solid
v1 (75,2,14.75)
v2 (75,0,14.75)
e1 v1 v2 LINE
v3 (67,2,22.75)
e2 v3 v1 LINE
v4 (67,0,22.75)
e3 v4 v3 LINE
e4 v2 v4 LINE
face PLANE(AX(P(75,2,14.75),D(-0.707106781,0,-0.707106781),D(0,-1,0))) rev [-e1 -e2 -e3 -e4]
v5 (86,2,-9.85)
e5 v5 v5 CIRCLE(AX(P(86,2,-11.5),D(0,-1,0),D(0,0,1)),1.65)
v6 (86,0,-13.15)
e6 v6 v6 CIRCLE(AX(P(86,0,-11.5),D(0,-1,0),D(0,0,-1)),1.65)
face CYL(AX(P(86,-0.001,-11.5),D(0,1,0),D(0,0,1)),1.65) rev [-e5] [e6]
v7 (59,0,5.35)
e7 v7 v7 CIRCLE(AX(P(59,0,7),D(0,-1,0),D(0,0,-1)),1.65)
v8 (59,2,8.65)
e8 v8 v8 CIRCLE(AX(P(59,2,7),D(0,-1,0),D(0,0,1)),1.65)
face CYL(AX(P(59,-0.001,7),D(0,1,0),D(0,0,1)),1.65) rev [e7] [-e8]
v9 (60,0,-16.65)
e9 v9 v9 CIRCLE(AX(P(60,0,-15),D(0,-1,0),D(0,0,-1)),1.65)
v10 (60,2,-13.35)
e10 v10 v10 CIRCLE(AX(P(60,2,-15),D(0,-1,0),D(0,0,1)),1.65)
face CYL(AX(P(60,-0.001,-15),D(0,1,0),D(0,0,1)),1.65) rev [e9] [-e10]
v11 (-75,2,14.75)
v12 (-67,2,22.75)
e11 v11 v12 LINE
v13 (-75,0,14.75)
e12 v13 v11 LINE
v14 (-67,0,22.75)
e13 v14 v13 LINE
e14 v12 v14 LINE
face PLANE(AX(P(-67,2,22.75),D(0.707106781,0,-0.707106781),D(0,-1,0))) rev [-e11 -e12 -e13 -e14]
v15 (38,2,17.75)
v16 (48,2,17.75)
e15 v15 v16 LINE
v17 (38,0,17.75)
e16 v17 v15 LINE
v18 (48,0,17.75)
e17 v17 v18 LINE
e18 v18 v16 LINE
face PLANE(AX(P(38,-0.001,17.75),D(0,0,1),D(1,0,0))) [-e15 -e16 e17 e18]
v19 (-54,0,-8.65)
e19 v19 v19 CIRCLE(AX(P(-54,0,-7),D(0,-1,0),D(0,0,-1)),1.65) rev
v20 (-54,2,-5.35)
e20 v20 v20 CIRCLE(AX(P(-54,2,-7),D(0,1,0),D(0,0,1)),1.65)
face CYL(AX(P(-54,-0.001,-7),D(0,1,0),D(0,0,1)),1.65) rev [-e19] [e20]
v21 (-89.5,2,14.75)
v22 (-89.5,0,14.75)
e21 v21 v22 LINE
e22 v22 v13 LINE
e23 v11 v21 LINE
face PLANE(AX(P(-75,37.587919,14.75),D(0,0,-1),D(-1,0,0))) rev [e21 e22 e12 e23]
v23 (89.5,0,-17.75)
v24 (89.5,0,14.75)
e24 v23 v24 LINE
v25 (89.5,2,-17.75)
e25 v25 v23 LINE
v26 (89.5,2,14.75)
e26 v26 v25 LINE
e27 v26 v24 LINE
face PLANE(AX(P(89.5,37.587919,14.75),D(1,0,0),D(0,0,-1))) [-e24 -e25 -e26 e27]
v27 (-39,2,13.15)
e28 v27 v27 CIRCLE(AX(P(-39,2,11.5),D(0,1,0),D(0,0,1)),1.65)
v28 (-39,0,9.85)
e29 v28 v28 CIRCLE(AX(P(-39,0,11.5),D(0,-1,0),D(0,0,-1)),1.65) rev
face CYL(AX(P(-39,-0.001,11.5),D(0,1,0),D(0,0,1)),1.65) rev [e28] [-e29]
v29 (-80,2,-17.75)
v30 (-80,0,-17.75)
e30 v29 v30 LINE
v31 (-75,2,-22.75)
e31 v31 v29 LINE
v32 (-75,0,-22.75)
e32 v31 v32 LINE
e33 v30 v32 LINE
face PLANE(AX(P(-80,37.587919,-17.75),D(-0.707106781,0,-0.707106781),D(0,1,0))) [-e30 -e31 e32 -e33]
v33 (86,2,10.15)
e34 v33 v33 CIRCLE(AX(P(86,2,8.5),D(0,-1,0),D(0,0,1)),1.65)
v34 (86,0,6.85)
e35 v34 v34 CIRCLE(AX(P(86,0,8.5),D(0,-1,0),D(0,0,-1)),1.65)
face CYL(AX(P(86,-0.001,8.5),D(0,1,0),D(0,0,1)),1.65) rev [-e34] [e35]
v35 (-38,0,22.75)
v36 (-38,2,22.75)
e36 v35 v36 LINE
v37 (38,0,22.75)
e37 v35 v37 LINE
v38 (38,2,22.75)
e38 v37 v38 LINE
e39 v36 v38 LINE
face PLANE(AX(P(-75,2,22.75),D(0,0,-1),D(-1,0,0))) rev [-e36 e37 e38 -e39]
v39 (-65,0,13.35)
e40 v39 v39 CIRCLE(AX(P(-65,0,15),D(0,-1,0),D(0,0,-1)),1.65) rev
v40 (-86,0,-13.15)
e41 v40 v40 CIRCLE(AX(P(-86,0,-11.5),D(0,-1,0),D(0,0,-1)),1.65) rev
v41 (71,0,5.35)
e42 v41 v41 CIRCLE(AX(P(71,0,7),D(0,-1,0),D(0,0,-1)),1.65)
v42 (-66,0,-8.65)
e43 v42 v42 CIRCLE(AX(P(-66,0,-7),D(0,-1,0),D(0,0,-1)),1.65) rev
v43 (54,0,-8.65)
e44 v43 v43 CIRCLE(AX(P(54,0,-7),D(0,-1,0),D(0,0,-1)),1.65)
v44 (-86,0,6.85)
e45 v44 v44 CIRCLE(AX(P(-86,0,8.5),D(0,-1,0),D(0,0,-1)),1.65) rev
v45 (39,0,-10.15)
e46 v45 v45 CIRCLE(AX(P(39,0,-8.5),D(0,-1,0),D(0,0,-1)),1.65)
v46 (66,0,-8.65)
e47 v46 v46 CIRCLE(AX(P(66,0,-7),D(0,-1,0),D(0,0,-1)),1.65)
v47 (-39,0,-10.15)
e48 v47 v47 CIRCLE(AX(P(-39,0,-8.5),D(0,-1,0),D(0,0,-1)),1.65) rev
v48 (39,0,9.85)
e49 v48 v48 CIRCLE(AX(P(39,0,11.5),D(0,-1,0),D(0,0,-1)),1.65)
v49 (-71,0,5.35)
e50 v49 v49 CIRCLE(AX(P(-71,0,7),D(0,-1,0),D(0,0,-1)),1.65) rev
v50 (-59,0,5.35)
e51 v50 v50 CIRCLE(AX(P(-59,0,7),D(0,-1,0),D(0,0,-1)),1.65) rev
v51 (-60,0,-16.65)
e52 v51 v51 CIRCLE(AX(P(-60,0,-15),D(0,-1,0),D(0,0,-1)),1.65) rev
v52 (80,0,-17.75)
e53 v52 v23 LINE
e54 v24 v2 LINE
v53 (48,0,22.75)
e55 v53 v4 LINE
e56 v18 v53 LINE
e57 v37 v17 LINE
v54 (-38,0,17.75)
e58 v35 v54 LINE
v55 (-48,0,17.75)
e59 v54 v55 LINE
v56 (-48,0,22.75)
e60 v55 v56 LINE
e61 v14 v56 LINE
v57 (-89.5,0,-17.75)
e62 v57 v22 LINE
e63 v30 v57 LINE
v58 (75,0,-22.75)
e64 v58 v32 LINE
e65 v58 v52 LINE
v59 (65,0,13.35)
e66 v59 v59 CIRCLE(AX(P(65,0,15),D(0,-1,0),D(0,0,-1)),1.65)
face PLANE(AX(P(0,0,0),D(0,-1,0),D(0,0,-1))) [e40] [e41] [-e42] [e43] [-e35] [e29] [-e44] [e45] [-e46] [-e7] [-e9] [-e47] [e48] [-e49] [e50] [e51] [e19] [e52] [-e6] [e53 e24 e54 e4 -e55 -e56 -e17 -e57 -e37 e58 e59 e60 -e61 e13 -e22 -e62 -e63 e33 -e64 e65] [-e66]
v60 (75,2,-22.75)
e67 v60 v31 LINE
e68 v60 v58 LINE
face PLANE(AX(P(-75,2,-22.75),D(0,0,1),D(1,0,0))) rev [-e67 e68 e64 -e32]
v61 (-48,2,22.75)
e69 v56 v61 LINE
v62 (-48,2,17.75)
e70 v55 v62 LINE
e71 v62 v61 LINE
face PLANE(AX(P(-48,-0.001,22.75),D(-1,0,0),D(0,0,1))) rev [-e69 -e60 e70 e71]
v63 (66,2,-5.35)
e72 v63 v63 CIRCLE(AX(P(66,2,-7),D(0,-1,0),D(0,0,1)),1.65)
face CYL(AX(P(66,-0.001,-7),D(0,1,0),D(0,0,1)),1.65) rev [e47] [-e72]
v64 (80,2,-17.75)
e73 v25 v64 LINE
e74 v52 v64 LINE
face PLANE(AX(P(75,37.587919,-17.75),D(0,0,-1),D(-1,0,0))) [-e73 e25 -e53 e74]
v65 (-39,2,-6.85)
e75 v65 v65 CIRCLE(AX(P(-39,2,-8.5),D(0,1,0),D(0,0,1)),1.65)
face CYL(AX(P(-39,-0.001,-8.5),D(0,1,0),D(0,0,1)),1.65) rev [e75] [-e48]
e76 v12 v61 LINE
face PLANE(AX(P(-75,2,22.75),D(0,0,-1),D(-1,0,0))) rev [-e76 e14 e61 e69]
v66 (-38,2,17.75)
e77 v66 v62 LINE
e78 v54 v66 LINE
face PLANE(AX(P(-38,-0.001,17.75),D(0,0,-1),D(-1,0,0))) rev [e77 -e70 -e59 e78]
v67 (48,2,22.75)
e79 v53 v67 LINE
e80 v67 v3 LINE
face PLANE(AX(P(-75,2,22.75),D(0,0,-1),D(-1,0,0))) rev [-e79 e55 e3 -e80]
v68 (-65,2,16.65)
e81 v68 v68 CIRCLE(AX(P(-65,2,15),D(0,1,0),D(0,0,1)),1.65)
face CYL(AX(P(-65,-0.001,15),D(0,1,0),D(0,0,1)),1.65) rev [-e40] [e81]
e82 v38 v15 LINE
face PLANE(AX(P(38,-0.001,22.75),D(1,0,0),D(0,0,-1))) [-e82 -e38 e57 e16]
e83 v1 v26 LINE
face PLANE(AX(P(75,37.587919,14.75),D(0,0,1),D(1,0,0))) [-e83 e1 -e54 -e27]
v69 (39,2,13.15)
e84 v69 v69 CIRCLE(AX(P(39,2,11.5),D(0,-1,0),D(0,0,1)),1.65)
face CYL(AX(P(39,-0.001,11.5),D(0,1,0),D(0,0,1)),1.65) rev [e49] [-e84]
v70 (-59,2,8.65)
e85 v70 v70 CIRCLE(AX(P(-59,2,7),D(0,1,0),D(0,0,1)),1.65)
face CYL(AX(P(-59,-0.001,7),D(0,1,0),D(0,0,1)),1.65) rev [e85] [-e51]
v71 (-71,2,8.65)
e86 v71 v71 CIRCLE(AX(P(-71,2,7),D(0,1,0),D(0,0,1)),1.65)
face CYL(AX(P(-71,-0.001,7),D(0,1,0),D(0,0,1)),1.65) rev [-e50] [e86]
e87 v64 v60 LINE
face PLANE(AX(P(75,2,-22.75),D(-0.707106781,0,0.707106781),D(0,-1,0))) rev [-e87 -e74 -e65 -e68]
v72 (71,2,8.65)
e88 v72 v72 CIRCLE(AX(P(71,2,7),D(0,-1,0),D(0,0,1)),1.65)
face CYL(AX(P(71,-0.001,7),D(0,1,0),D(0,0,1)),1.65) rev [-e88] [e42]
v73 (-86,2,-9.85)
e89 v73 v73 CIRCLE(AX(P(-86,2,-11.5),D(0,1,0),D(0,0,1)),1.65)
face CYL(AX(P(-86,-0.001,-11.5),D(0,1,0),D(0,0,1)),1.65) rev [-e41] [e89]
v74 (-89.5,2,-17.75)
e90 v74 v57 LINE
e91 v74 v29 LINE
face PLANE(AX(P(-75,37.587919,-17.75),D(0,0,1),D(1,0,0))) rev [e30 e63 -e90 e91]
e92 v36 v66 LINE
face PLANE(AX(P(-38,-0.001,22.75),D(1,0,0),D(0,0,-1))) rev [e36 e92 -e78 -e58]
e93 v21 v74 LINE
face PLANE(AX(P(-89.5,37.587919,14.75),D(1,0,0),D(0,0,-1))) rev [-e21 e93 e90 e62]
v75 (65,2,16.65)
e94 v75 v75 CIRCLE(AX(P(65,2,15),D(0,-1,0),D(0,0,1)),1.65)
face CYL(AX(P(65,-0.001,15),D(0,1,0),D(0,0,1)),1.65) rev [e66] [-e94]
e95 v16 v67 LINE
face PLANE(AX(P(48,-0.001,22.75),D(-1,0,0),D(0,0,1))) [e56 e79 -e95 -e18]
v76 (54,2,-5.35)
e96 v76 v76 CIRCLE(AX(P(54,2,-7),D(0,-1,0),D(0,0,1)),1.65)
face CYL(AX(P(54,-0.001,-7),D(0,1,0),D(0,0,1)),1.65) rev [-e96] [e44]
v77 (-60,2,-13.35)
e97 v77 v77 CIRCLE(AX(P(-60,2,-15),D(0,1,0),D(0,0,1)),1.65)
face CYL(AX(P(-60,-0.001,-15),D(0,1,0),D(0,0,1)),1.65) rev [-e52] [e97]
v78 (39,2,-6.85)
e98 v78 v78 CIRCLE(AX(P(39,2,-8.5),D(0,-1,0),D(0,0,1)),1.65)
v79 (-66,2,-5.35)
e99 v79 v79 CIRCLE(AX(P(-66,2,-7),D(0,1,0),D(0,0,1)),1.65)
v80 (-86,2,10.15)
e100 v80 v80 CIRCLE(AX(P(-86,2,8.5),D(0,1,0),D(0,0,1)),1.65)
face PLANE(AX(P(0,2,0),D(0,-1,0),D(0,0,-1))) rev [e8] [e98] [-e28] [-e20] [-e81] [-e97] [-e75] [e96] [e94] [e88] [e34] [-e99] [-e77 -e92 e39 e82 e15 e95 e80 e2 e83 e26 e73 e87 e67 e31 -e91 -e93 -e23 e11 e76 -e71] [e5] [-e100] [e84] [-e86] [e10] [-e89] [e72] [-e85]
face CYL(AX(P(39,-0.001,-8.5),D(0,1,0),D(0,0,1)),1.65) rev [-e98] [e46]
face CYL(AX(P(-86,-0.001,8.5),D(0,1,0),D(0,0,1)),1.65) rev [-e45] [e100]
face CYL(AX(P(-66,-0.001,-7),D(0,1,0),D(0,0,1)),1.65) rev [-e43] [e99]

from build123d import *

# Parameters (mm, degrees)
SKETCH_1_W          = 150
SKETCH_1_H          = 45.5
EXTRUDE_1_DEPTH     = 2
CUT_EXTRUDE_1_REACH = 80.4
SKETCH_2_R          = 1.65
CUT_EXTRUDE_2_REACH = 80.4
SKETCH_4_W          = 10
SKETCH_4_H          = 5
CHAMFER_1_SIZE      = 8
SKETCH_6_W          = 14.5
SKETCH_6_H          = 32.5
EXTRUDE_2_DEPTH     = 2
CUT_EXTRUDE_3_REACH = 94.368
SKETCH_7_R          = 1.65
CHAMFER_2_SIZE      = 5


with BuildPart() as part:
    # 草图1 → 凸台-拉伸1 (new body)
    with BuildSketch(Plane(origin=(0, 0, 0), x_dir=(1, 0, 0), z_dir=(0, 1, 0))):
        Rectangle(SKETCH_1_W, SKETCH_1_H)
    extrude(amount=EXTRUDE_1_DEPTH)

    # 草图2 → 切除-拉伸1 (cut, up to next)
    with BuildSketch(Plane(origin=(0, 2, 0), x_dir=(1, 0, 0), z_dir=(0, 1, 0)), mode=Mode.PRIVATE) as cut_extrude_1_sk1:
        with Locations(Location((-60, 15, 0), (0, 0, 270))):
            Circle(SKETCH_2_R)
    cut_extrude_1_tool1 = extrude(cut_extrude_1_sk1.sketch, amount=-CUT_EXTRUDE_1_REACH, mode=Mode.PRIVATE) & part.part
    # 草图2 → 切除-拉伸1 (cut, up to next)
    with BuildSketch(Plane(origin=(0, 2, 0), x_dir=(1, 0, 0), z_dir=(0, 1, 0)), mode=Mode.PRIVATE) as cut_extrude_1_sk2:
        with Locations(Location((-66, 7, 0), (0, 0, 270))):
            Circle(SKETCH_2_R)
    cut_extrude_1_tool2 = extrude(cut_extrude_1_sk2.sketch, amount=-CUT_EXTRUDE_1_REACH, mode=Mode.PRIVATE) & part.part
    # 草图2 → 切除-拉伸1 (cut, up to next)
    with BuildSketch(Plane(origin=(0, 2, 0), x_dir=(1, 0, 0), z_dir=(0, 1, 0)), mode=Mode.PRIVATE) as cut_extrude_1_sk3:
        with Locations(Location((-54, 7, 0), (0, 0, 270))):
            Circle(SKETCH_2_R)
    cut_extrude_1_tool3 = extrude(cut_extrude_1_sk3.sketch, amount=-CUT_EXTRUDE_1_REACH, mode=Mode.PRIVATE) & part.part
    # 草图2 → 切除-拉伸1 (cut, up to next)
    with BuildSketch(Plane(origin=(0, 2, 0), x_dir=(1, 0, 0), z_dir=(0, 1, 0)), mode=Mode.PRIVATE) as cut_extrude_1_sk4:
        with Locations(Location((-71, -7, 0), (0, 0, 270))):
            Circle(SKETCH_2_R)
    cut_extrude_1_tool4 = extrude(cut_extrude_1_sk4.sketch, amount=-CUT_EXTRUDE_1_REACH, mode=Mode.PRIVATE) & part.part
    # 草图2 → 切除-拉伸1 (cut, up to next)
    with BuildSketch(Plane(origin=(0, 2, 0), x_dir=(1, 0, 0), z_dir=(0, 1, 0)), mode=Mode.PRIVATE) as cut_extrude_1_sk5:
        with Locations(Location((-59, -7, 0), (0, 0, 270))):
            Circle(SKETCH_2_R)
    cut_extrude_1_tool5 = extrude(cut_extrude_1_sk5.sketch, amount=-CUT_EXTRUDE_1_REACH, mode=Mode.PRIVATE) & part.part
    # 草图2 → 切除-拉伸1 (cut, up to next)
    with BuildSketch(Plane(origin=(0, 2, 0), x_dir=(1, 0, 0), z_dir=(0, 1, 0)), mode=Mode.PRIVATE) as cut_extrude_1_sk6:
        with Locations(Location((-65, -15, 0), (0, 0, 270))):
            Circle(SKETCH_2_R)
    cut_extrude_1_tool6 = extrude(cut_extrude_1_sk6.sketch, amount=-CUT_EXTRUDE_1_REACH, mode=Mode.PRIVATE) & part.part
    cut_extrude_1_1 = cut_extrude_1_tool1.solids().sort_by_distance((-60, 2, -15))[0]
    add(cut_extrude_1_1, mode=Mode.SUBTRACT)
    cut_extrude_1_2 = cut_extrude_1_tool2.solids().sort_by_distance((-66, 2, -7))[0]
    add(cut_extrude_1_2, mode=Mode.SUBTRACT)
    cut_extrude_1_3 = cut_extrude_1_tool3.solids().sort_by_distance((-54, 2, -7))[0]
    add(cut_extrude_1_3, mode=Mode.SUBTRACT)
    cut_extrude_1_4 = cut_extrude_1_tool4.solids().sort_by_distance((-71, 2, 7))[0]
    add(cut_extrude_1_4, mode=Mode.SUBTRACT)
    cut_extrude_1_5 = cut_extrude_1_tool5.solids().sort_by_distance((-59, 2, 7))[0]
    add(cut_extrude_1_5, mode=Mode.SUBTRACT)
    cut_extrude_1_6 = cut_extrude_1_tool6.solids().sort_by_distance((-65, 2, 15))[0]
    add(cut_extrude_1_6, mode=Mode.SUBTRACT)
    cut_extrude_1 = cut_extrude_1_1 + cut_extrude_1_2 + cut_extrude_1_3 + cut_extrude_1_4 + cut_extrude_1_5 + cut_extrude_1_6  # 切除-拉伸1 as one shape, for the pattern or mirror that repeats it

    # 草图4 → 切除-拉伸2 (cut, up to next)
    with BuildSketch(Plane(origin=(0, 2, 0), x_dir=(1, 0, 0), z_dir=(0, 1, 0)), mode=Mode.PRIVATE) as cut_extrude_2_sk1:
        with Locations((-43, -20.25)):
            Rectangle(SKETCH_4_W, SKETCH_4_H)
    cut_extrude_2_tool1 = extrude(cut_extrude_2_sk1.sketch, amount=-CUT_EXTRUDE_2_REACH, mode=Mode.PRIVATE) & part.part
    cut_extrude_2 = cut_extrude_2_tool1.solids().sort_by_distance((-43, 2, 20.25))[0]
    add(cut_extrude_2, mode=Mode.SUBTRACT)

    # 镜向1: 切除-拉伸1, 切除-拉伸2 across plane
    add(cut_extrude_1.mirror(Plane(origin=(0, 0, 0), x_dir=(0, 0, 1), z_dir=(1, 0, 0))), mode=Mode.SUBTRACT)
    add(cut_extrude_2.mirror(Plane(origin=(0, 0, 0), x_dir=(0, 0, 1), z_dir=(1, 0, 0))), mode=Mode.SUBTRACT)

    # 倒角1
    chamfer_1_edges = [part.edges().sort_by_distance(p)[0] for p in [
        (75, 1, 22.75),
        (-75, 1, 22.75),
    ]]
    chamfer(chamfer_1_edges, length=CHAMFER_1_SIZE)

    # 草图6 → 凸台-拉伸2 (add)
    with BuildSketch(Plane(origin=(0, 0, 0), x_dir=(1, 0, 0), z_dir=(0, 1, 0))):
        with Locations((-82.25, 1.5)):
            Rectangle(SKETCH_6_W, SKETCH_6_H)
    extrude_2 = extrude(amount=EXTRUDE_2_DEPTH)

    # 草图7 → 切除-拉伸3 (cut, up to next)
    with BuildSketch(Plane(origin=(0, 2, 0), x_dir=(1, 0, 0), z_dir=(0, 1, 0)), mode=Mode.PRIVATE) as cut_extrude_3_sk1:
        with Locations(Location((-86, -8.5, 0), (0, 0, 270))):
            Circle(SKETCH_7_R)
    cut_extrude_3_tool1 = extrude(cut_extrude_3_sk1.sketch, amount=-CUT_EXTRUDE_3_REACH, mode=Mode.PRIVATE) & part.part
    # 草图7 → 切除-拉伸3 (cut, up to next)
    with BuildSketch(Plane(origin=(0, 2, 0), x_dir=(1, 0, 0), z_dir=(0, 1, 0)), mode=Mode.PRIVATE) as cut_extrude_3_sk2:
        with Locations(Location((-86, 11.5, 0), (0, 0, 270))):
            Circle(SKETCH_7_R)
    cut_extrude_3_tool2 = extrude(cut_extrude_3_sk2.sketch, amount=-CUT_EXTRUDE_3_REACH, mode=Mode.PRIVATE) & part.part
    # 草图7 → 切除-拉伸3 (cut, up to next)
    with BuildSketch(Plane(origin=(0, 2, 0), x_dir=(1, 0, 0), z_dir=(0, 1, 0)), mode=Mode.PRIVATE) as cut_extrude_3_sk3:
        with Locations(Location((-39, -11.5, 0), (0, 0, 270))):
            Circle(SKETCH_7_R)
    cut_extrude_3_tool3 = extrude(cut_extrude_3_sk3.sketch, amount=-CUT_EXTRUDE_3_REACH, mode=Mode.PRIVATE) & part.part
    # 草图7 → 切除-拉伸3 (cut, up to next)
    with BuildSketch(Plane(origin=(0, 2, 0), x_dir=(1, 0, 0), z_dir=(0, 1, 0)), mode=Mode.PRIVATE) as cut_extrude_3_sk4:
        with Locations(Location((-39, 8.5, 0), (0, 0, 270))):
            Circle(SKETCH_7_R)
    cut_extrude_3_tool4 = extrude(cut_extrude_3_sk4.sketch, amount=-CUT_EXTRUDE_3_REACH, mode=Mode.PRIVATE) & part.part
    cut_extrude_3_1 = cut_extrude_3_tool1.solids().sort_by_distance((-86, 2, 8.5))[0]
    add(cut_extrude_3_1, mode=Mode.SUBTRACT)
    cut_extrude_3_2 = cut_extrude_3_tool2.solids().sort_by_distance((-86, 2, -11.5))[0]
    add(cut_extrude_3_2, mode=Mode.SUBTRACT)
    cut_extrude_3_3 = cut_extrude_3_tool3.solids().sort_by_distance((-39, 2, 11.5))[0]
    add(cut_extrude_3_3, mode=Mode.SUBTRACT)
    cut_extrude_3_4 = cut_extrude_3_tool4.solids().sort_by_distance((-39, 2, -8.5))[0]
    add(cut_extrude_3_4, mode=Mode.SUBTRACT)
    cut_extrude_3 = cut_extrude_3_1 + cut_extrude_3_2 + cut_extrude_3_3 + cut_extrude_3_4  # 切除-拉伸3 as one shape, for the pattern or mirror that repeats it

    # 镜向3: 凸台-拉伸2, 切除-拉伸3 across plane
    add(extrude_2.mirror(Plane(origin=(0, 0, 0), x_dir=(0, 0, 1), z_dir=(1, 0, 0))))
    add(cut_extrude_3.mirror(Plane(origin=(0, 0, 0), x_dir=(0, 0, 1), z_dir=(1, 0, 0))), mode=Mode.SUBTRACT)

    # 倒角2
    chamfer_2_edges = [part.edges().sort_by_distance(p)[0] for p in [
        (-75, 1, -17.75),
        (75, 1, -17.75),
    ]]
    chamfer(chamfer_2_edges, length=CHAMFER_2_SIZE - 0.0001)  # a hair under: the kernel refuses the full size


solid = part.part
